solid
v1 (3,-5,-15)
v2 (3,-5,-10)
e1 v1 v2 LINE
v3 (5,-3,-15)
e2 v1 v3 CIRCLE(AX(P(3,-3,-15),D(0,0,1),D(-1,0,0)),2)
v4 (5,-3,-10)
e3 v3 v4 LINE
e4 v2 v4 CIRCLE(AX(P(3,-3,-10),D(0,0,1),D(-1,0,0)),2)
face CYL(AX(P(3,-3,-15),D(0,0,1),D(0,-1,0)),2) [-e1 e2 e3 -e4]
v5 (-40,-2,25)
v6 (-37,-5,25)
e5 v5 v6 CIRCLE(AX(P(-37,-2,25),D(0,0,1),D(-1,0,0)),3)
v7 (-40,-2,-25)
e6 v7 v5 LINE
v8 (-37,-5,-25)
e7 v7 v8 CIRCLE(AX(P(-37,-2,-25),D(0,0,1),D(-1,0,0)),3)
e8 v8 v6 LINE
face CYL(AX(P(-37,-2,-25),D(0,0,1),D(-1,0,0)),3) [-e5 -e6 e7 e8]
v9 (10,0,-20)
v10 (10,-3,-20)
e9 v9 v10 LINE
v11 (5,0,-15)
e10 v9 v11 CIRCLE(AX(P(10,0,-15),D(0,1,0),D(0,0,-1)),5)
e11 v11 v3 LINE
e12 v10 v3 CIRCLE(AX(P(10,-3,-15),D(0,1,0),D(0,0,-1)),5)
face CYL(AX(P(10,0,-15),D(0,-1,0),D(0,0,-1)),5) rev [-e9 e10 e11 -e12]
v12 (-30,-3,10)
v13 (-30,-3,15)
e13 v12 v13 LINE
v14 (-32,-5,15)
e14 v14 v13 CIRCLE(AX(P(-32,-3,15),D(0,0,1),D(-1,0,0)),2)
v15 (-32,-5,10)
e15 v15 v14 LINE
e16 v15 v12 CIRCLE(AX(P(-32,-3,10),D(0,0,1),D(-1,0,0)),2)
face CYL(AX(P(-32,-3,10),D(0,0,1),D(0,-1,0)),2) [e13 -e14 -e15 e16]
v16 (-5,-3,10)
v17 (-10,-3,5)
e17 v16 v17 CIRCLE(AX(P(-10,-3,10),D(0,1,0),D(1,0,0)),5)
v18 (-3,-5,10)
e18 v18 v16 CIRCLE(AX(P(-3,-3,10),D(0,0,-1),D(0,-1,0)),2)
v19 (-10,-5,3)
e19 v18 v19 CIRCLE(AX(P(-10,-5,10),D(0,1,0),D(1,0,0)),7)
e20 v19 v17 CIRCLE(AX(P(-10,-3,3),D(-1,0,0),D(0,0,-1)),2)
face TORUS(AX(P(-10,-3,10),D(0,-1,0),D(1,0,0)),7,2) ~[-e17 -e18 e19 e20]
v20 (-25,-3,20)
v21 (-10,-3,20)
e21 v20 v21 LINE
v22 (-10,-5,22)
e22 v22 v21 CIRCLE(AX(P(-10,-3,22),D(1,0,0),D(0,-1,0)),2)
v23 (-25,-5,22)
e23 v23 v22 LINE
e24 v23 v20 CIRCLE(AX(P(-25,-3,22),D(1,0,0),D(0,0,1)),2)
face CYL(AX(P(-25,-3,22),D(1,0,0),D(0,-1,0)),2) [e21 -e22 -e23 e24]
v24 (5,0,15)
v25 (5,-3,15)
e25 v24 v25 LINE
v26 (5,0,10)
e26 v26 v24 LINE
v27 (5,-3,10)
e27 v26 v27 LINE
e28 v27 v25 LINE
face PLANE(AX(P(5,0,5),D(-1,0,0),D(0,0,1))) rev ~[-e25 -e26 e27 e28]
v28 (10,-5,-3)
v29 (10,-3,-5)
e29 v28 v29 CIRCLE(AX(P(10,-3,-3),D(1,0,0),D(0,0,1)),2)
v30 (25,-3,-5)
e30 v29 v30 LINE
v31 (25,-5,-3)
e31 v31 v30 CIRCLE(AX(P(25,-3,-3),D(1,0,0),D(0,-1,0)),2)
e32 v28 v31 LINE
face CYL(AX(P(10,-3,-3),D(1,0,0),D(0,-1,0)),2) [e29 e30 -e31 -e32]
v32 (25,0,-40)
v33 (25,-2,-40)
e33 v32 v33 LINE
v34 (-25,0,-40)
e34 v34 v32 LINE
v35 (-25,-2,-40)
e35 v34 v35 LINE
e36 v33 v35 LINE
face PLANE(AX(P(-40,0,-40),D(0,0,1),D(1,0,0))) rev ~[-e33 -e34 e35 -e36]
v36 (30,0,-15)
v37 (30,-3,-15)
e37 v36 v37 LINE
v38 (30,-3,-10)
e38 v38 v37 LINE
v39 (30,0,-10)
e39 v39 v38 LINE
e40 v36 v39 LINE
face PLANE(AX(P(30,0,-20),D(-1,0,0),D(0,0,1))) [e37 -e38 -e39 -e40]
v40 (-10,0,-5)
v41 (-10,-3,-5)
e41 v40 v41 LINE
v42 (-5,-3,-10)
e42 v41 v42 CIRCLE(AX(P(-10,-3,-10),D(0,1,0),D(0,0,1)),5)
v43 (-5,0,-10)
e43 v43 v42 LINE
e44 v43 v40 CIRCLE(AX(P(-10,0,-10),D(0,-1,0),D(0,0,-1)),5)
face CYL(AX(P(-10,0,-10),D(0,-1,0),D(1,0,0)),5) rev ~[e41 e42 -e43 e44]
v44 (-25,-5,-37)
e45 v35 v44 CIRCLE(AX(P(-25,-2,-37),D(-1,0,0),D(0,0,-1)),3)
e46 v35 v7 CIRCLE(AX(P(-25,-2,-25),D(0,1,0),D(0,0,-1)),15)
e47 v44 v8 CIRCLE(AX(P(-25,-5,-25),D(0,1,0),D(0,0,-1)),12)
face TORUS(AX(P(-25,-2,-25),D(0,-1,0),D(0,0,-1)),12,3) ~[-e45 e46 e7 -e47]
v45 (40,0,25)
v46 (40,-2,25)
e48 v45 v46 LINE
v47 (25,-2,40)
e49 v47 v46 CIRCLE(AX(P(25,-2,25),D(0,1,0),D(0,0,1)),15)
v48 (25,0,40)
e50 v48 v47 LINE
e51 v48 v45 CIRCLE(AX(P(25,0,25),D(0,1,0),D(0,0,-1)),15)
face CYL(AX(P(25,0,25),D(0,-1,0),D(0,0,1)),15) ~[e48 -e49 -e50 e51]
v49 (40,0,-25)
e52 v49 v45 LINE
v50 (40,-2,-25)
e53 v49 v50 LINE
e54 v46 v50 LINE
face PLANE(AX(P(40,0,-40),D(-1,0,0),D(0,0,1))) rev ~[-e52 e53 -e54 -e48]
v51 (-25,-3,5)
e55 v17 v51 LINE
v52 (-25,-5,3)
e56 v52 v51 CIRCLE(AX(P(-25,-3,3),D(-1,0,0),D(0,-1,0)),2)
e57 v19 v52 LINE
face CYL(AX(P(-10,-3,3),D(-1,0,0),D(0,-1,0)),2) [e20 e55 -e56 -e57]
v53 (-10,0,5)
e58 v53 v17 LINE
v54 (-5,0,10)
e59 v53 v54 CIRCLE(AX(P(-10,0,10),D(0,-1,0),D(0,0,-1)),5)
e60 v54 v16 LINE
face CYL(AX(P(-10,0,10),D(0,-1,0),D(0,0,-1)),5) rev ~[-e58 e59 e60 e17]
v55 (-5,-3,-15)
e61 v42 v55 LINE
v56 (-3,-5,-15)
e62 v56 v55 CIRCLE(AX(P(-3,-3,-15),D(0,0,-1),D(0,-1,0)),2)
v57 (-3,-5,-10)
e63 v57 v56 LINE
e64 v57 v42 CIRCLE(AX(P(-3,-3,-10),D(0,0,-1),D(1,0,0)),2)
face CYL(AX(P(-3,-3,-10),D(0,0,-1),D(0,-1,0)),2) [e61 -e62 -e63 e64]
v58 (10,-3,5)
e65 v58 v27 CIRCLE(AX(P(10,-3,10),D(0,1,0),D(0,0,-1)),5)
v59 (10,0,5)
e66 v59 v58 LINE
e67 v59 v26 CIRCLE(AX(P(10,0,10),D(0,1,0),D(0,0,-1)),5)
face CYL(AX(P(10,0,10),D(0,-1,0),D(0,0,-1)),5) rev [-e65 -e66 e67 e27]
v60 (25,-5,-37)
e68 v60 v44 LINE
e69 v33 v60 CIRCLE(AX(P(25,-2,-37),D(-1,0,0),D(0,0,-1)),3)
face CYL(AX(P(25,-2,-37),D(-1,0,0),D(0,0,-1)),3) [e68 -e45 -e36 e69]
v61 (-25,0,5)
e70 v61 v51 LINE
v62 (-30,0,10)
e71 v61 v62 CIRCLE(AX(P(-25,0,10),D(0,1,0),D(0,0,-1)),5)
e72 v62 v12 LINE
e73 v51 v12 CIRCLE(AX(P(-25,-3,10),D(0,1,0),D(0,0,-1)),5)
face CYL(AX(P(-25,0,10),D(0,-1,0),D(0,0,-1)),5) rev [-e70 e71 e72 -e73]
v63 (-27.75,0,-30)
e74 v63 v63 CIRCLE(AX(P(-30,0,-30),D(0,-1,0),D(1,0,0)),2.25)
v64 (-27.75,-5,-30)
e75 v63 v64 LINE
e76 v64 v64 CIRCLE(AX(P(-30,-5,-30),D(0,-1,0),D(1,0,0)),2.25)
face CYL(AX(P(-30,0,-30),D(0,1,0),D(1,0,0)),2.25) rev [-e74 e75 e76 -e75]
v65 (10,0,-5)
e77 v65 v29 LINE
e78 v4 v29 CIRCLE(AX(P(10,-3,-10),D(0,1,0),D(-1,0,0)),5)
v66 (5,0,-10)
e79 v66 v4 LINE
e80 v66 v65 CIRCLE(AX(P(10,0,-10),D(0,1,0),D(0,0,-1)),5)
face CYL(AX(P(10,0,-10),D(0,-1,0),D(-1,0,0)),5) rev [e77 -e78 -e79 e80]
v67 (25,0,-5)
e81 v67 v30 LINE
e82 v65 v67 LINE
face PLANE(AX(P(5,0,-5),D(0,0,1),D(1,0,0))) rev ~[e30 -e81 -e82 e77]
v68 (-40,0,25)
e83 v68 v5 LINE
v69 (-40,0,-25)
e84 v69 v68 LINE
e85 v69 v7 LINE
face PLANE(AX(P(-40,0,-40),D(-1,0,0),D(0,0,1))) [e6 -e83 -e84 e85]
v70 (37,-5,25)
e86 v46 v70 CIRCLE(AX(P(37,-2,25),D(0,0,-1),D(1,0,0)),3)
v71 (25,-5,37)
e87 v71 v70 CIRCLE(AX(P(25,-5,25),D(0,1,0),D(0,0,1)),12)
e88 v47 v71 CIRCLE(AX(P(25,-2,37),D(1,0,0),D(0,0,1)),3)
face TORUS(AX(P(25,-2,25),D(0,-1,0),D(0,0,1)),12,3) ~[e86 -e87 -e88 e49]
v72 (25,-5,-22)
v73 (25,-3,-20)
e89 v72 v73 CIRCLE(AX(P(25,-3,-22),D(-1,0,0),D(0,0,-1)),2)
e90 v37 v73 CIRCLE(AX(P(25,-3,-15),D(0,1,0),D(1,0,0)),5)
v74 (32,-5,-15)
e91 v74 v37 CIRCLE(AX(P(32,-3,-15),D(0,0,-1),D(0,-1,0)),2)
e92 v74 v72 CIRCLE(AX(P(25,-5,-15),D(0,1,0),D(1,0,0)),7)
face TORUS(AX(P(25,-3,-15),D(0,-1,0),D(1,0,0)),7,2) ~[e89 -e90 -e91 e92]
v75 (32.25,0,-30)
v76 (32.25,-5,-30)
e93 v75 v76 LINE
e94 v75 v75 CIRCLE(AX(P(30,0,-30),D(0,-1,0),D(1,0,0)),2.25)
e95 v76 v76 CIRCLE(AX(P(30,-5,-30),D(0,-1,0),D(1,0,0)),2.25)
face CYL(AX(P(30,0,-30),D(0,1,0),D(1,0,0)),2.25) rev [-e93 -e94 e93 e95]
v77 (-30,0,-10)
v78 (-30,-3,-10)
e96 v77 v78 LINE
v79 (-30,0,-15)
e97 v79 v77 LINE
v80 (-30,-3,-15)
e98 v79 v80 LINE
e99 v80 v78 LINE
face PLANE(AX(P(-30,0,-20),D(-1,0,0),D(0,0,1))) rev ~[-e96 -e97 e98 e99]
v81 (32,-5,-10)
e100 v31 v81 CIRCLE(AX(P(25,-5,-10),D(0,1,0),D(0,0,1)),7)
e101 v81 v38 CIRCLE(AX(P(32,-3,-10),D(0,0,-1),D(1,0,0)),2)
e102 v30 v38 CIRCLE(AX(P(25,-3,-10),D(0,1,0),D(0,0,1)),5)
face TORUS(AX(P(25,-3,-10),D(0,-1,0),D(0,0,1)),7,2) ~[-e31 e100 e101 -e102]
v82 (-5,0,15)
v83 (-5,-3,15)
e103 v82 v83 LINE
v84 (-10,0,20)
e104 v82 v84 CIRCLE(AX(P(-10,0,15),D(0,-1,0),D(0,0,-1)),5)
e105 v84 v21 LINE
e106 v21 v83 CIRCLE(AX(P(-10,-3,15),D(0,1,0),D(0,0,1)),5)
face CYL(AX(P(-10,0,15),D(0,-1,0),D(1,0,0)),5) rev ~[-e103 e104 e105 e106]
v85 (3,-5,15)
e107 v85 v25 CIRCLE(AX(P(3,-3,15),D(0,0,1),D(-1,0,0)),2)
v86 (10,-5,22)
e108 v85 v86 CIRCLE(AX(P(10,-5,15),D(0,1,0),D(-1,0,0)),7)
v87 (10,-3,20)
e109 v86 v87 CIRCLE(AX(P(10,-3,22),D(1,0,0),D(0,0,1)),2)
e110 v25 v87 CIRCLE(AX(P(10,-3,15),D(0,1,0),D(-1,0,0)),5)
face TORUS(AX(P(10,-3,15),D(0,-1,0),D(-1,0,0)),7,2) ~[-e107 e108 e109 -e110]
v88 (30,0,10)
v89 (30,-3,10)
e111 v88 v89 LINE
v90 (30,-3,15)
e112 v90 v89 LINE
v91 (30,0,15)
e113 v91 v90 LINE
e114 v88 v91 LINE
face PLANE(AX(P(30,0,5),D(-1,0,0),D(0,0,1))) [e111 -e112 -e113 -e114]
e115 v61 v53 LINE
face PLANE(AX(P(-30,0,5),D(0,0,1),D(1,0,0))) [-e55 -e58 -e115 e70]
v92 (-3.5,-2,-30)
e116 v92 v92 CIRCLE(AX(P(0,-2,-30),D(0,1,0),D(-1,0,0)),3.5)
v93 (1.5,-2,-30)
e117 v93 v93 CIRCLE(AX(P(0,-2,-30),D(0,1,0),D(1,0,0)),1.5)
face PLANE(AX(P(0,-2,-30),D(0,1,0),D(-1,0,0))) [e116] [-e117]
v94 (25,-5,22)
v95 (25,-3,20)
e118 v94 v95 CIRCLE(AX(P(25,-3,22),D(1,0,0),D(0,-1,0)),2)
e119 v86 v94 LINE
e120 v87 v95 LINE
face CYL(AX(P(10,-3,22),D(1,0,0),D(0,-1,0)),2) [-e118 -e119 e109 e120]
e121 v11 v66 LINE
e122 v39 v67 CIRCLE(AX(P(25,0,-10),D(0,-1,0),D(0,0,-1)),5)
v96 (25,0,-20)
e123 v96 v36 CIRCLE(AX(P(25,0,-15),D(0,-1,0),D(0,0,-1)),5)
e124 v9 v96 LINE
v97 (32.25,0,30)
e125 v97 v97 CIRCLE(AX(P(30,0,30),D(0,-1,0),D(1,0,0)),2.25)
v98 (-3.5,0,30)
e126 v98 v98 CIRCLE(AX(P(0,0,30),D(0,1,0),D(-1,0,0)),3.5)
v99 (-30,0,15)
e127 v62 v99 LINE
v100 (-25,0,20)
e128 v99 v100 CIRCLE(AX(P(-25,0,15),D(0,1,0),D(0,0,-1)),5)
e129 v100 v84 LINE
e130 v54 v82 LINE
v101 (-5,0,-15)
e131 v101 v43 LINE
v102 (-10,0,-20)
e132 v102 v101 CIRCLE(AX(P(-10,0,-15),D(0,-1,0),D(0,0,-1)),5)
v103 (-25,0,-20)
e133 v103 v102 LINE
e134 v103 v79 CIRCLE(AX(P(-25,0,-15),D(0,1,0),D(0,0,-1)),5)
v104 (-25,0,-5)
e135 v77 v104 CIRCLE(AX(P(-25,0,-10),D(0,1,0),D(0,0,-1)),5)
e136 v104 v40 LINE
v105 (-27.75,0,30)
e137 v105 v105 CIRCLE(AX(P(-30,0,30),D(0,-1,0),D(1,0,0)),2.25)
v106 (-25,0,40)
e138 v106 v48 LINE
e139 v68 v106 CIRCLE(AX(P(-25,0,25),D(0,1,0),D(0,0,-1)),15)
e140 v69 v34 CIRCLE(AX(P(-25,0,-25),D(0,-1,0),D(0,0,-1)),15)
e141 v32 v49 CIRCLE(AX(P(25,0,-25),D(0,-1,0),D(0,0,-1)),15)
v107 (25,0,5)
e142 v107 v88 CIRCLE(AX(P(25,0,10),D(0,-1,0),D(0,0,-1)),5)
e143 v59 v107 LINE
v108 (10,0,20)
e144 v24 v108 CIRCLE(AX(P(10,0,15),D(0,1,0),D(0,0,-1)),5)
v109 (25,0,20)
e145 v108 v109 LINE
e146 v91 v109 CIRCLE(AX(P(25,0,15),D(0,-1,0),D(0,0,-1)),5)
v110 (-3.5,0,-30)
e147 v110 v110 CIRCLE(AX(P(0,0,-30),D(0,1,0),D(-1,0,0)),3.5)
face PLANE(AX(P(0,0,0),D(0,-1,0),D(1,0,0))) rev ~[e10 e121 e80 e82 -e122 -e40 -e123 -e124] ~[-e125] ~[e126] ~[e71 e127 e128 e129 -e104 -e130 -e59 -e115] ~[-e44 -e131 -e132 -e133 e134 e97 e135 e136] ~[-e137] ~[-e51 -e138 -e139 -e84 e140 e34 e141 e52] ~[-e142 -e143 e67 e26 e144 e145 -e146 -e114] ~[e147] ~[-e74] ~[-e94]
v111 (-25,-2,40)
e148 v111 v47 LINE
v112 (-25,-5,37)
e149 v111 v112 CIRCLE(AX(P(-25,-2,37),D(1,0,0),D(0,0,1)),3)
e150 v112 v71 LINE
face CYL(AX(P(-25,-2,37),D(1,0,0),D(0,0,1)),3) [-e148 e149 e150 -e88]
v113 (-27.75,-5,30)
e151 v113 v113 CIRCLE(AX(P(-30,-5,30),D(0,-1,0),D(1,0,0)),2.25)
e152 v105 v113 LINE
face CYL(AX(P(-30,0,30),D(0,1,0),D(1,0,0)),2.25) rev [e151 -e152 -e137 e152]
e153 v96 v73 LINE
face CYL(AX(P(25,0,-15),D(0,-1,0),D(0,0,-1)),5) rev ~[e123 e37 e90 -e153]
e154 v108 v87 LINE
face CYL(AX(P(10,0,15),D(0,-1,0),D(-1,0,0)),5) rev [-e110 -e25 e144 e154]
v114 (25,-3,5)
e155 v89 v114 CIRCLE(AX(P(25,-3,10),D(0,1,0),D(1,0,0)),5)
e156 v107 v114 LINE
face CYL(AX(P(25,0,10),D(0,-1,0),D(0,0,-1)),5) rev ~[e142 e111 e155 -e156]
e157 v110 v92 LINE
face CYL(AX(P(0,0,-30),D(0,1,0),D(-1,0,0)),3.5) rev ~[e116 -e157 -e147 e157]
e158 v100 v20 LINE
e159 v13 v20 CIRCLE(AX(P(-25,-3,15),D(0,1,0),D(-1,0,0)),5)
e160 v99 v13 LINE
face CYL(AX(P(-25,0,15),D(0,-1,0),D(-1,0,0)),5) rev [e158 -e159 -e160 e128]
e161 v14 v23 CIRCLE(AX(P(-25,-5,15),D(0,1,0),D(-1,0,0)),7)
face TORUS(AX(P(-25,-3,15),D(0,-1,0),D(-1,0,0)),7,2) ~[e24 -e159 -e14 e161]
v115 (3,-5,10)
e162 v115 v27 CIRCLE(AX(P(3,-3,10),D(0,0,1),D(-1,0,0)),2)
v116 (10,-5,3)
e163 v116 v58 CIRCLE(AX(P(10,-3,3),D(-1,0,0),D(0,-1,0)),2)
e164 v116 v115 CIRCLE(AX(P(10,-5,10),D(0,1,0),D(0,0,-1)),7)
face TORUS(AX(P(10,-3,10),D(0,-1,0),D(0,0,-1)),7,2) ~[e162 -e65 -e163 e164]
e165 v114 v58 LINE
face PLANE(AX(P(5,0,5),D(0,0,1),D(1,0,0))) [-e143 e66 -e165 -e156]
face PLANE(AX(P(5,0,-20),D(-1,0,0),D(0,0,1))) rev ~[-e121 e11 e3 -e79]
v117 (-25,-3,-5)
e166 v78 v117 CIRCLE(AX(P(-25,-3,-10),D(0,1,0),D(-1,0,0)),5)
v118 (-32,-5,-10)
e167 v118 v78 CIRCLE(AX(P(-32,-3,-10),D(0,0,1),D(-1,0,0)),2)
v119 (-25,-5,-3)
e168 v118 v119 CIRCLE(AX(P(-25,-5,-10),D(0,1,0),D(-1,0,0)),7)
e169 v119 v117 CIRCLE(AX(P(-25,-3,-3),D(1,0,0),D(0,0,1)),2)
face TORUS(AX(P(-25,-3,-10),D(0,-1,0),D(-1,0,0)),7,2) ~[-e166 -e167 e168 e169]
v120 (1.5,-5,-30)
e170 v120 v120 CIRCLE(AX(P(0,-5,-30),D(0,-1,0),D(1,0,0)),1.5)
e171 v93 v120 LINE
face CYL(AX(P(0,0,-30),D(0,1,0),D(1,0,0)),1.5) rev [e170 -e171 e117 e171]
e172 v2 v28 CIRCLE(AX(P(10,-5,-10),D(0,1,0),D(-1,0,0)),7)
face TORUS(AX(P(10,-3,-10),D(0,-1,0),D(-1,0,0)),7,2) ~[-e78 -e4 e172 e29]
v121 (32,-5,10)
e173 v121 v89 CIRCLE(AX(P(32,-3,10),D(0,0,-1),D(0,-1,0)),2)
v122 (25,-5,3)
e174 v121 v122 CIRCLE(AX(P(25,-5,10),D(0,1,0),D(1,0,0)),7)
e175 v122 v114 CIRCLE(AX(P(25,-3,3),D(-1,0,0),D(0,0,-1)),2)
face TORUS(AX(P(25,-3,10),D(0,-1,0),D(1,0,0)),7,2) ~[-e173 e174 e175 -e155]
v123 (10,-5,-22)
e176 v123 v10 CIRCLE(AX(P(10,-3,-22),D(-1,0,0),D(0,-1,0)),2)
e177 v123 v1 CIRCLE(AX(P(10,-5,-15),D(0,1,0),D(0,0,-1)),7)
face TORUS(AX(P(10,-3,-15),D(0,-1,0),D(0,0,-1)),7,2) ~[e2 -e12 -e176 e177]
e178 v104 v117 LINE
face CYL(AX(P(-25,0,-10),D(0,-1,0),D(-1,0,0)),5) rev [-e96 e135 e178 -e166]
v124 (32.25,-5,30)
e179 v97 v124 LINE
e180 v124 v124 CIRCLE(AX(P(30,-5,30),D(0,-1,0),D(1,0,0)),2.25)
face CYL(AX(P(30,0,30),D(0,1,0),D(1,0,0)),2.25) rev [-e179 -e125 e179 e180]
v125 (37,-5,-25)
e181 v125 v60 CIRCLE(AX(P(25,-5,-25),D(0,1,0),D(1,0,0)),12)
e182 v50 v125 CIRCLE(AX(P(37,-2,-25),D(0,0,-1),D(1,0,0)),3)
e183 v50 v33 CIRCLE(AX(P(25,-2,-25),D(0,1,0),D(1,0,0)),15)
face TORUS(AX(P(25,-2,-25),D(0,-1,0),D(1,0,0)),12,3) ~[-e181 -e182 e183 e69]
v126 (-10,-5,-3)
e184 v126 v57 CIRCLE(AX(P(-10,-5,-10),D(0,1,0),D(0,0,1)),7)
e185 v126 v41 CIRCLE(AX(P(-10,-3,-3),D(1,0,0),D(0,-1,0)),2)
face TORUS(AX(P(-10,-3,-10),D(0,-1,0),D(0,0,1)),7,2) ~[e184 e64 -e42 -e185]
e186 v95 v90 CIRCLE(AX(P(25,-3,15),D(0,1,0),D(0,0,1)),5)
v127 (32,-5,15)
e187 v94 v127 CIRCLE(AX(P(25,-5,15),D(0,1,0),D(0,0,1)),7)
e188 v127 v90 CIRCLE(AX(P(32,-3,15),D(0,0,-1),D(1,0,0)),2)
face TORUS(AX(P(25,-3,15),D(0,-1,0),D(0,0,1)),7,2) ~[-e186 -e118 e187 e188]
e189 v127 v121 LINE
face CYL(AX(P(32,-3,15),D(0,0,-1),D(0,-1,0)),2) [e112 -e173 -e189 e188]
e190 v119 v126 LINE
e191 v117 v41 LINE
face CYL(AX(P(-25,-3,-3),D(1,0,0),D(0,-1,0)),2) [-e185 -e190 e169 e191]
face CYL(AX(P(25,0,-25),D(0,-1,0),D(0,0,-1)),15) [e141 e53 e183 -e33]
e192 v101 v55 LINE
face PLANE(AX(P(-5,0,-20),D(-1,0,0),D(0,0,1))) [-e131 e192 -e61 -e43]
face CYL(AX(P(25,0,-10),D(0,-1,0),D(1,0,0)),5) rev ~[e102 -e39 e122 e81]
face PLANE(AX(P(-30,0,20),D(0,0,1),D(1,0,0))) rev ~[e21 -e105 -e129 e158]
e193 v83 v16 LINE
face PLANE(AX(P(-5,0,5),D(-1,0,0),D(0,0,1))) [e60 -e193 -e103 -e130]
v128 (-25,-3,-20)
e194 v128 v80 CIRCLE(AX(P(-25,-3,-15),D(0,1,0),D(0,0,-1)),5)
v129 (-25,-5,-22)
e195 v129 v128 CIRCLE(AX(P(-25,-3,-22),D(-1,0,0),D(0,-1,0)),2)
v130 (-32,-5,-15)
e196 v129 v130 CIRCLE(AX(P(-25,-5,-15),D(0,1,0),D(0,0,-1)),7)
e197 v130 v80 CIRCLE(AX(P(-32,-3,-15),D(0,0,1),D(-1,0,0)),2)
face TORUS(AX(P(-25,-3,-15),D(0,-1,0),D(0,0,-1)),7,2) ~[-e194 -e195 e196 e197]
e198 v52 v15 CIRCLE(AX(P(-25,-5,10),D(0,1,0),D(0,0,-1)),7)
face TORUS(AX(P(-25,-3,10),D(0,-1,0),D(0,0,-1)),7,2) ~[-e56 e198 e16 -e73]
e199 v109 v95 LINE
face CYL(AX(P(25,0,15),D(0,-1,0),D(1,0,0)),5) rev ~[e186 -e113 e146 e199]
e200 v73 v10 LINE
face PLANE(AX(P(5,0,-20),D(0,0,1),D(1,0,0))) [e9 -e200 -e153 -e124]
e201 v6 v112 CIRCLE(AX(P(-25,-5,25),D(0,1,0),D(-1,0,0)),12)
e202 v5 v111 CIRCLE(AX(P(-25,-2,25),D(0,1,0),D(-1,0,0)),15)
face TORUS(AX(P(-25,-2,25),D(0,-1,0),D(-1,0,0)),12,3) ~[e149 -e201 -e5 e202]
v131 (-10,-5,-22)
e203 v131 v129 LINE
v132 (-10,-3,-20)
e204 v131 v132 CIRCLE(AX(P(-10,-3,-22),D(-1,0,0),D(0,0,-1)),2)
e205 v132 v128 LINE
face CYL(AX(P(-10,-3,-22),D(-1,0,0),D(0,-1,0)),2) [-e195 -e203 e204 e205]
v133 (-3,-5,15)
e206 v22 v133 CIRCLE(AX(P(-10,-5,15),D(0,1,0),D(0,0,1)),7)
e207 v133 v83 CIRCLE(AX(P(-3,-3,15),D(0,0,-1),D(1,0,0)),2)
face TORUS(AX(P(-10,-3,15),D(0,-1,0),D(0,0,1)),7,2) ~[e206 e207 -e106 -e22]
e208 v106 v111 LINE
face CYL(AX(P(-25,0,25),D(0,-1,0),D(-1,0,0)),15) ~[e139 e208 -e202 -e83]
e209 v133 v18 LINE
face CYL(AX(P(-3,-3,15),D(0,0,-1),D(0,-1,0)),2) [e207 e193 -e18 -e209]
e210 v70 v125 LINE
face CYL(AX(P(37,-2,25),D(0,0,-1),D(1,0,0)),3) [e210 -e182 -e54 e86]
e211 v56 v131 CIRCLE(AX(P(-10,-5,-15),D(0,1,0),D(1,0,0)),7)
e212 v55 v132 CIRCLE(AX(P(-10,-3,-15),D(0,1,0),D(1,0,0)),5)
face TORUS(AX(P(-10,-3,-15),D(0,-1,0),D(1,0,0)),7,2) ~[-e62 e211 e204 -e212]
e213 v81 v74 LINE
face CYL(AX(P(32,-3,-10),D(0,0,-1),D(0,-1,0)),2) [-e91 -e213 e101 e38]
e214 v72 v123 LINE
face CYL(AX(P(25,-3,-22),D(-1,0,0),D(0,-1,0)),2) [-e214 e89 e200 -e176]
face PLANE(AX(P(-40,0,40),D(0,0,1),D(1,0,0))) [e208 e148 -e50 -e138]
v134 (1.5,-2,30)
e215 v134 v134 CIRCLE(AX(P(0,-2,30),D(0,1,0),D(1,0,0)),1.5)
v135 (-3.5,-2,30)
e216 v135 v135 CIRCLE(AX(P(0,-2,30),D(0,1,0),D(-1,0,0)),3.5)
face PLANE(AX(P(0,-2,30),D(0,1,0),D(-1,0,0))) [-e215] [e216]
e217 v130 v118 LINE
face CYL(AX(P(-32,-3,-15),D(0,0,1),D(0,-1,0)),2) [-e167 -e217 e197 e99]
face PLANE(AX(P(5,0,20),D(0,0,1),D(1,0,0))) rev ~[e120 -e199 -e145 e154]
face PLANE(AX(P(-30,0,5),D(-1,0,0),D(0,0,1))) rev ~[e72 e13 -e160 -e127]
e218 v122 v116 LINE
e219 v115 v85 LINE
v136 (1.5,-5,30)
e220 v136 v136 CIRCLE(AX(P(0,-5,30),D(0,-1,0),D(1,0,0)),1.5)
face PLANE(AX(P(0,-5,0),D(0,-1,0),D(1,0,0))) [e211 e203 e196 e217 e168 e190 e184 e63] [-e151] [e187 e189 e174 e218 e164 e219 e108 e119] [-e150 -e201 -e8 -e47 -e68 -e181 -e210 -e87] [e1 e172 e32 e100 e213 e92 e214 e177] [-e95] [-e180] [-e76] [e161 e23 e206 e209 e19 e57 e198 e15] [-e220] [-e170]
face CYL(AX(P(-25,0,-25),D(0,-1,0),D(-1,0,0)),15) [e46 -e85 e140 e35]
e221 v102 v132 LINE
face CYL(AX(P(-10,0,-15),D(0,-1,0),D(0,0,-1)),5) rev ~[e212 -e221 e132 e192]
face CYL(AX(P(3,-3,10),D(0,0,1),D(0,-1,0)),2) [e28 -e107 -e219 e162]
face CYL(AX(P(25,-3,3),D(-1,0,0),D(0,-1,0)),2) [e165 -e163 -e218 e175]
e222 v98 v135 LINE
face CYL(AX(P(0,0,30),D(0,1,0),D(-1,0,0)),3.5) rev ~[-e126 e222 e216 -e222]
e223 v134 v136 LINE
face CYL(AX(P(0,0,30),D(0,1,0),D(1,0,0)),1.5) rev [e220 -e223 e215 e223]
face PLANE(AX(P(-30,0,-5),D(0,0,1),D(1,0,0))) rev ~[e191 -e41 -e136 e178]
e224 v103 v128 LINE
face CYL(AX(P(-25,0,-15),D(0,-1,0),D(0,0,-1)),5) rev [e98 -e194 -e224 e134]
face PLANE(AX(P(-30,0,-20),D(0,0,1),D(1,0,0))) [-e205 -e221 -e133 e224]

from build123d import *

# Parameters (mm, degrees)
F0_W     = 80
F0_H     = 80
F0_R     = 2.25
F0_W_2   = 25
F0_H_2   = 15
F0_R_2   = 1.5
F1_DEPTH = 5
F2_R     = 5
F3_R     = 5
F4_R     = 5
F5_R     = 15
F6_R     = 3
F7_R     = 2
F8_R     = 3.5
F9_DEPTH = 2


with BuildPart() as f1:
    # F0 (on Front) → F1 (new body)
    with BuildSketch(Plane.XZ):
        Rectangle(F0_W, F0_H)
        with Locations((-30, -30)):
            Circle(F0_R, mode=Mode.SUBTRACT)
        with Locations((-17.5, -12.5)):
            Rectangle(F0_W_2, F0_H_2, mode=Mode.SUBTRACT)
        with Locations((0, -30)):
            Circle(F0_R_2, mode=Mode.SUBTRACT)
        with Locations((30, -30)):
            Circle(F0_R, mode=Mode.SUBTRACT)
        with Locations((17.5, -12.5)):
            Rectangle(F0_W_2, F0_H_2, mode=Mode.SUBTRACT)
        with Locations((-17.5, 12.5)):
            Rectangle(F0_W_2, F0_H_2, mode=Mode.SUBTRACT)
        with Locations((-30, 30)):
            Circle(F0_R, mode=Mode.SUBTRACT)
        with Locations((17.5, 12.5)):
            Rectangle(F0_W_2, F0_H_2, mode=Mode.SUBTRACT)
        with Locations((0, 30)):
            Circle(F0_R_2, mode=Mode.SUBTRACT)
        with Locations((30, 30)):
            Circle(F0_R, mode=Mode.SUBTRACT)
    extrude(amount=F1_DEPTH)

    # F2
    f2_edges = [f1.edges().sort_by_distance(p)[0] for p in [
        (30, -2.5, 5),
        (30, -2.5, 20),
        (5, -2.5, 20),
        (5, -2.5, 5),
    ]]
    fillet(f2_edges, radius=F2_R)

    # F3
    f3_edges = [f1.edges().sort_by_distance(p)[0] for p in [
        (-30, -2.5, 20),
        (-30, -2.5, 5),
        (-5, -2.5, 5),
        (-5, -2.5, 20),
    ]]
    fillet(f3_edges, radius=F3_R)

    # F4
    f4_edges = [f1.edges().sort_by_distance(p)[0] for p in [
        (-5, -2.5, -5),
        (30, -2.5, -5),
        (5, -2.5, -5),
        (-30, -2.5, -5),
        (30, -2.5, -20),
        (-5, -2.5, -20),
        (5, -2.5, -20),
        (-30, -2.5, -20),
    ]]
    fillet(f4_edges, radius=F4_R)

    # F5
    f5_edges = [f1.edges().sort_by_distance(p)[0] for p in [
        (40, -2.5, -40),
        (40, -2.5, 40),
        (-40, -2.5, 40),
        (-40, -2.5, -40),
    ]]
    fillet(f5_edges, radius=F5_R)

    # F6
    f6_edges = [f1.edges().sort_by_distance(p)[0] for p in [
        (35.606602, -5, 35.606602),
    ]]
    fillet(f6_edges, radius=F6_R)

    # F7
    f7_edges = [f1.edges().sort_by_distance(p)[0] for p in [
        (6.464466, -5, 18.535534),
        (6.464466, -5, -6.464466),
        (-28.535534, -5, 18.535534),
        (-28.535534, -5, -6.464466),
    ]]
    fillet(f7_edges, radius=F7_R)

    # F8 (on face) → F9 (cut)
    with BuildSketch(Plane(origin=(0, 0, 0), x_dir=(-1, 0, 0), z_dir=(0, 1, 0))):
        with Locations((0, 30)):
            Circle(F8_R)
        with Locations((0, -30)):
            Circle(F8_R)
    extrude(amount=-F9_DEPTH, mode=Mode.SUBTRACT)


solid = f1.part
